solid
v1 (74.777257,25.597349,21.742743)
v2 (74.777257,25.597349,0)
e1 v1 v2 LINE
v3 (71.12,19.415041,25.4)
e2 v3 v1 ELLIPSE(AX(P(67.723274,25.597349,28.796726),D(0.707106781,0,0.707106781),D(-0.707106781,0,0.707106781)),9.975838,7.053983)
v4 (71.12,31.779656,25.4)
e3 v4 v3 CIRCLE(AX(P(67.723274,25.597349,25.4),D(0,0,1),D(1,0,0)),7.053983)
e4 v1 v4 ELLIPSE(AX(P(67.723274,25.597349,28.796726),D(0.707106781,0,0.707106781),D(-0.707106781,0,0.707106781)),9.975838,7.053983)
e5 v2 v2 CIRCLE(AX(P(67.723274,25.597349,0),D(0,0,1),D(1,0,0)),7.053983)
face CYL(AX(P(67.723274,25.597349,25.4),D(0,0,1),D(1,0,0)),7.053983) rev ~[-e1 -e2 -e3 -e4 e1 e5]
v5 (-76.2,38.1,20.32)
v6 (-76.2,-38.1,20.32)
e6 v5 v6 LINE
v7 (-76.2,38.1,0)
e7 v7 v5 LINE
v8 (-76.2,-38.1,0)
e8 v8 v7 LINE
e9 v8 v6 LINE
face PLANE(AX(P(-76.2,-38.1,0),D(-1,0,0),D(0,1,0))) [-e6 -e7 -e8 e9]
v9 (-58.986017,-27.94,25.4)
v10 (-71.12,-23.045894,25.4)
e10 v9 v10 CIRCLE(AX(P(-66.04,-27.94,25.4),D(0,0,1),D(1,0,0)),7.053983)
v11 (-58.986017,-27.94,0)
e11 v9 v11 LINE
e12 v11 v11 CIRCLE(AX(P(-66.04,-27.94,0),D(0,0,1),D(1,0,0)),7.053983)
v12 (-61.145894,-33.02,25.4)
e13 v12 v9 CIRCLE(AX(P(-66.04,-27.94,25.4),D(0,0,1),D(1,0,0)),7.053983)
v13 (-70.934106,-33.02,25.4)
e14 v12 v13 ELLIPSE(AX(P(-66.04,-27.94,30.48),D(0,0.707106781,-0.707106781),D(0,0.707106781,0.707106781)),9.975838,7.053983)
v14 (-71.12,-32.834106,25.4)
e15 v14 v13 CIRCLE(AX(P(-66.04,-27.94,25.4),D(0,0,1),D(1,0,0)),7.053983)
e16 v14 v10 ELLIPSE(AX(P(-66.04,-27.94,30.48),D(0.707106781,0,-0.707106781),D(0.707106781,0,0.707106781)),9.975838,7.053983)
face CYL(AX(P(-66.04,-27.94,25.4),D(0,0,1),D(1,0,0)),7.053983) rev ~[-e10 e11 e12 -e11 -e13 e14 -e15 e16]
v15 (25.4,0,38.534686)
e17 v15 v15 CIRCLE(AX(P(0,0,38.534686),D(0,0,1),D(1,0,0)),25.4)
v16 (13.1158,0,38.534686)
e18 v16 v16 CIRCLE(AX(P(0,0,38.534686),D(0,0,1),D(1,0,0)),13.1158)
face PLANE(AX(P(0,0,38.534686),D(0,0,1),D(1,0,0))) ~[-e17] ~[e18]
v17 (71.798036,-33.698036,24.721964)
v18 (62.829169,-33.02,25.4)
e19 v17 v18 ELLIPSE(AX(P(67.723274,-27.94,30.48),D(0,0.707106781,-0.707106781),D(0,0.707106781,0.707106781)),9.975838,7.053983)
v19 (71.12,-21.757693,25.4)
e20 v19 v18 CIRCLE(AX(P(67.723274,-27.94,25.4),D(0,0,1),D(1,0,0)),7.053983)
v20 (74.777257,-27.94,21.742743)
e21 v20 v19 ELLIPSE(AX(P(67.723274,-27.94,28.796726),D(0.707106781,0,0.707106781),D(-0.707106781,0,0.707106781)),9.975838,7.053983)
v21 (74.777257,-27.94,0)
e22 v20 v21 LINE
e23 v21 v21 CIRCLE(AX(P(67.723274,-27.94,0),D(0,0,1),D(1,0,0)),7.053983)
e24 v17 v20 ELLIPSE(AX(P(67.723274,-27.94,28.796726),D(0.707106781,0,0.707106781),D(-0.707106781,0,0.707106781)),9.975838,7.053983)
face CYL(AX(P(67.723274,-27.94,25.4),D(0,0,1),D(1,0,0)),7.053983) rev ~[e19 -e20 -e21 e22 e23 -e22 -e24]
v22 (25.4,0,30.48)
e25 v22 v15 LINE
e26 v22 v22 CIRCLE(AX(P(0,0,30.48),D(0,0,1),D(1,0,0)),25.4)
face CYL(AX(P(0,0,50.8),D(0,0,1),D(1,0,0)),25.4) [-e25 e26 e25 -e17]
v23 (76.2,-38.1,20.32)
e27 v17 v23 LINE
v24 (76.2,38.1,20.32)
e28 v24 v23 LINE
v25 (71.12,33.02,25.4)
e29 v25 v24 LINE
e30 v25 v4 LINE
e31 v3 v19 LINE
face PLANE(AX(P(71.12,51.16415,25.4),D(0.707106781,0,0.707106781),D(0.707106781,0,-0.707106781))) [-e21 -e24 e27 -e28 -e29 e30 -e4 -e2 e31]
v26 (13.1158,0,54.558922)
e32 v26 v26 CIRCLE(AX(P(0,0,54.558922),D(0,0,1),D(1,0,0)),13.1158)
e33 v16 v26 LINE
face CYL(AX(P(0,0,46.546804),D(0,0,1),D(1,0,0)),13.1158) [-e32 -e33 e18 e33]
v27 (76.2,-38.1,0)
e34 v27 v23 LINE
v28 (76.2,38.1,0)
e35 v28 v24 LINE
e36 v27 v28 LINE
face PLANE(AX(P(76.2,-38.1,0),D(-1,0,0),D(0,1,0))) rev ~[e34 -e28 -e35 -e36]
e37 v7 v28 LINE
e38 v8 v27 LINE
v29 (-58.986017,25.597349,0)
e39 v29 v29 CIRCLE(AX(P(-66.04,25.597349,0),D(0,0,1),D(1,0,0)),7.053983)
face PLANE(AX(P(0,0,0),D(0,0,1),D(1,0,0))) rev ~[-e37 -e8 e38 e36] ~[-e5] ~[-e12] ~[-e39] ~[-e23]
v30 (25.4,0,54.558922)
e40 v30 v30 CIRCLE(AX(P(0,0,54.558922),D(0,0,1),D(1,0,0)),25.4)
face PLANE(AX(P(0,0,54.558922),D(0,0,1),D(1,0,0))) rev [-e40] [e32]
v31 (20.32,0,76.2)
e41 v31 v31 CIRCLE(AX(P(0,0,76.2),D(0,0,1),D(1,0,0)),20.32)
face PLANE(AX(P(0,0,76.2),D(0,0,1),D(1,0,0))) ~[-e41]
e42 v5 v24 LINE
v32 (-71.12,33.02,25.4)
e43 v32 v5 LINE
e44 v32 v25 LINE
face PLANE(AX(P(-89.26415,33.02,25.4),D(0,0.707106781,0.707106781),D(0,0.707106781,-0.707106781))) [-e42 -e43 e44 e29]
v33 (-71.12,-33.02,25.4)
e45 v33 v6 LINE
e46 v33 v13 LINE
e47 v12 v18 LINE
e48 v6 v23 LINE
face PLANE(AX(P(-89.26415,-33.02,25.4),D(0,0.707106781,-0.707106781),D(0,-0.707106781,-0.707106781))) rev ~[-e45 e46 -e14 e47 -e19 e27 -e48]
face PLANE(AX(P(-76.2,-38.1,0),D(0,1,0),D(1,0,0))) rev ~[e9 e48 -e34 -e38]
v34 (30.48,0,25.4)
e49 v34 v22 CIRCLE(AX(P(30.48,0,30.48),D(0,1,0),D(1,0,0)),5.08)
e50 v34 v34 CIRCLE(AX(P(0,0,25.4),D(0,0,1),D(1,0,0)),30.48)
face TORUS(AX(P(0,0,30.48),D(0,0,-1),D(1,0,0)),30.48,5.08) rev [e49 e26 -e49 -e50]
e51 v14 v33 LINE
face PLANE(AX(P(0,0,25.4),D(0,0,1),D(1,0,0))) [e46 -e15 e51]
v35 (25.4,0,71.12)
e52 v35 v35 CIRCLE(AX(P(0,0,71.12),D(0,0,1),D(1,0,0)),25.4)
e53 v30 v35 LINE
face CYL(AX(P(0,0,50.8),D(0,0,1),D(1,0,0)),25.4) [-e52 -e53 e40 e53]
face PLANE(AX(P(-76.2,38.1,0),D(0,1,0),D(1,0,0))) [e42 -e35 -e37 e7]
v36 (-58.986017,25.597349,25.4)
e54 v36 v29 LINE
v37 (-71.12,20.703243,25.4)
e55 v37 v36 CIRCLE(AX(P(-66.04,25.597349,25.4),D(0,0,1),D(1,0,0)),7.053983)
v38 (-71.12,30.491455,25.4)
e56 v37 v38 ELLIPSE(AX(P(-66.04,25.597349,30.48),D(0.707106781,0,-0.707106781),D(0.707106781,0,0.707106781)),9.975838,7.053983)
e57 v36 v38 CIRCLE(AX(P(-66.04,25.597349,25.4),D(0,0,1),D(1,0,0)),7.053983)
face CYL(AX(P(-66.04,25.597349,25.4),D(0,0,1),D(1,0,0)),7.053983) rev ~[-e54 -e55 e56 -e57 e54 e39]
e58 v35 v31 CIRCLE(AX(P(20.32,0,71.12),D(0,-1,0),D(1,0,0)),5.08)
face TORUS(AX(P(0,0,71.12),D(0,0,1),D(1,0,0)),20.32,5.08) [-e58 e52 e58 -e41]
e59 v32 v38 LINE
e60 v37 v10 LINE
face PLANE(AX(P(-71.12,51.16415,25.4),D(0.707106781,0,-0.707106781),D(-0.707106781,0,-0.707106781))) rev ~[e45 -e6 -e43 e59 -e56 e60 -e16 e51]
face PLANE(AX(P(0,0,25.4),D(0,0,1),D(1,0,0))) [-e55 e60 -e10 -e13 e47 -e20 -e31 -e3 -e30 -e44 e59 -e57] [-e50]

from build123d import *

# Parameters (mm, degrees)
F0_W         = 152.4
F0_H         = 76.2
F1_DEPTH     = 25.4
F2_R         = 7.0539826123
F3_DEPTH     = 25.401
F4_W         = 25.4
F4_H         = 50.8
F6_W         = 18.2314971462
F6_H         = 16.024235636
F9_R         = 5.08
F10_T1_DEPTH = 178.5282991577
F10_T3_DEPTH = 102.3282991577


# Not quite as in the source:
# - a fillet or chamfer that OpenCascade refuses, or shapes differently, is made with other operations: its cross-section is extruded or revolved along the edge and cut away or added


with BuildPart() as f1:
    # F0 (on Top) → F1 (new body)
    with BuildSketch(Plane.XY):
        Rectangle(F0_W, F0_H)
    extrude(amount=F1_DEPTH)

    # F2 (on face) → F3 (cut, through all)
    with BuildSketch(Plane.XY.offset(25.4)):
        with Locations((67.723274231, 25.5973488092)):
            Circle(F2_R)
        with Locations((-66.04, 25.5973488092)):
            Circle(F2_R)
        with Locations((-66.04, -27.94)):
            Circle(F2_R)
        with Locations((67.723274231, -27.94)):
            Circle(F2_R)
    extrude(amount=-F3_DEPTH, mode=Mode.SUBTRACT)

    # F4 (on Front) → F5 (revolve)
    with BuildSketch(Plane.XZ):
        with Locations((12.7, 50.8)):
            Rectangle(F4_W, F4_H)
    revolve(axis=Axis((0, 0, 50.8), (0, 0, 1)))

    # F6 (on Front) → F8 (revolve, cut)
    with BuildSketch(Plane.XZ):
        with Locations((22.2315485589, 46.5468037874)):
            Rectangle(F6_W, F6_H)
    revolve(axis=Axis((0, 0, 32.2526581585), (0, 0, 1)), mode=Mode.SUBTRACT)

    # F9
    f9_edges = [f1.edges().sort_by_distance(p)[0] for p in [
        (-25.4, 0, 76.2),
        (-25.4, 0, 25.4),
    ]]
    fillet(f9_edges, radius=F9_R)

    # F10: chamfer of 5.08 on 4 edges, made by hand

    # F10_s2 → F10_t1 (cut)
    with BuildSketch(Plane.YZ.offset(-89.2641495789)):
        Polygon((-33.02, 25.4), (-38.1, 20.32), (-38.1, 25.4), align=None)
        Polygon((33.02, 25.4), (38.1, 20.32), (38.1, 25.4), align=None)
    extrude(amount=F10_T1_DEPTH, mode=Mode.SUBTRACT)

    # F10_s4 → F10_t3 (cut)
    with BuildSketch(Plane.XZ.offset(-51.1641495789)):
        Polygon((71.12, 25.4), (76.2, 20.32), (76.2, 25.4), align=None)
        Polygon((-71.12, 25.4), (-76.2, 20.32), (-76.2, 25.4), align=None)
    extrude(amount=F10_T3_DEPTH, mode=Mode.SUBTRACT)


solid = f1.part
